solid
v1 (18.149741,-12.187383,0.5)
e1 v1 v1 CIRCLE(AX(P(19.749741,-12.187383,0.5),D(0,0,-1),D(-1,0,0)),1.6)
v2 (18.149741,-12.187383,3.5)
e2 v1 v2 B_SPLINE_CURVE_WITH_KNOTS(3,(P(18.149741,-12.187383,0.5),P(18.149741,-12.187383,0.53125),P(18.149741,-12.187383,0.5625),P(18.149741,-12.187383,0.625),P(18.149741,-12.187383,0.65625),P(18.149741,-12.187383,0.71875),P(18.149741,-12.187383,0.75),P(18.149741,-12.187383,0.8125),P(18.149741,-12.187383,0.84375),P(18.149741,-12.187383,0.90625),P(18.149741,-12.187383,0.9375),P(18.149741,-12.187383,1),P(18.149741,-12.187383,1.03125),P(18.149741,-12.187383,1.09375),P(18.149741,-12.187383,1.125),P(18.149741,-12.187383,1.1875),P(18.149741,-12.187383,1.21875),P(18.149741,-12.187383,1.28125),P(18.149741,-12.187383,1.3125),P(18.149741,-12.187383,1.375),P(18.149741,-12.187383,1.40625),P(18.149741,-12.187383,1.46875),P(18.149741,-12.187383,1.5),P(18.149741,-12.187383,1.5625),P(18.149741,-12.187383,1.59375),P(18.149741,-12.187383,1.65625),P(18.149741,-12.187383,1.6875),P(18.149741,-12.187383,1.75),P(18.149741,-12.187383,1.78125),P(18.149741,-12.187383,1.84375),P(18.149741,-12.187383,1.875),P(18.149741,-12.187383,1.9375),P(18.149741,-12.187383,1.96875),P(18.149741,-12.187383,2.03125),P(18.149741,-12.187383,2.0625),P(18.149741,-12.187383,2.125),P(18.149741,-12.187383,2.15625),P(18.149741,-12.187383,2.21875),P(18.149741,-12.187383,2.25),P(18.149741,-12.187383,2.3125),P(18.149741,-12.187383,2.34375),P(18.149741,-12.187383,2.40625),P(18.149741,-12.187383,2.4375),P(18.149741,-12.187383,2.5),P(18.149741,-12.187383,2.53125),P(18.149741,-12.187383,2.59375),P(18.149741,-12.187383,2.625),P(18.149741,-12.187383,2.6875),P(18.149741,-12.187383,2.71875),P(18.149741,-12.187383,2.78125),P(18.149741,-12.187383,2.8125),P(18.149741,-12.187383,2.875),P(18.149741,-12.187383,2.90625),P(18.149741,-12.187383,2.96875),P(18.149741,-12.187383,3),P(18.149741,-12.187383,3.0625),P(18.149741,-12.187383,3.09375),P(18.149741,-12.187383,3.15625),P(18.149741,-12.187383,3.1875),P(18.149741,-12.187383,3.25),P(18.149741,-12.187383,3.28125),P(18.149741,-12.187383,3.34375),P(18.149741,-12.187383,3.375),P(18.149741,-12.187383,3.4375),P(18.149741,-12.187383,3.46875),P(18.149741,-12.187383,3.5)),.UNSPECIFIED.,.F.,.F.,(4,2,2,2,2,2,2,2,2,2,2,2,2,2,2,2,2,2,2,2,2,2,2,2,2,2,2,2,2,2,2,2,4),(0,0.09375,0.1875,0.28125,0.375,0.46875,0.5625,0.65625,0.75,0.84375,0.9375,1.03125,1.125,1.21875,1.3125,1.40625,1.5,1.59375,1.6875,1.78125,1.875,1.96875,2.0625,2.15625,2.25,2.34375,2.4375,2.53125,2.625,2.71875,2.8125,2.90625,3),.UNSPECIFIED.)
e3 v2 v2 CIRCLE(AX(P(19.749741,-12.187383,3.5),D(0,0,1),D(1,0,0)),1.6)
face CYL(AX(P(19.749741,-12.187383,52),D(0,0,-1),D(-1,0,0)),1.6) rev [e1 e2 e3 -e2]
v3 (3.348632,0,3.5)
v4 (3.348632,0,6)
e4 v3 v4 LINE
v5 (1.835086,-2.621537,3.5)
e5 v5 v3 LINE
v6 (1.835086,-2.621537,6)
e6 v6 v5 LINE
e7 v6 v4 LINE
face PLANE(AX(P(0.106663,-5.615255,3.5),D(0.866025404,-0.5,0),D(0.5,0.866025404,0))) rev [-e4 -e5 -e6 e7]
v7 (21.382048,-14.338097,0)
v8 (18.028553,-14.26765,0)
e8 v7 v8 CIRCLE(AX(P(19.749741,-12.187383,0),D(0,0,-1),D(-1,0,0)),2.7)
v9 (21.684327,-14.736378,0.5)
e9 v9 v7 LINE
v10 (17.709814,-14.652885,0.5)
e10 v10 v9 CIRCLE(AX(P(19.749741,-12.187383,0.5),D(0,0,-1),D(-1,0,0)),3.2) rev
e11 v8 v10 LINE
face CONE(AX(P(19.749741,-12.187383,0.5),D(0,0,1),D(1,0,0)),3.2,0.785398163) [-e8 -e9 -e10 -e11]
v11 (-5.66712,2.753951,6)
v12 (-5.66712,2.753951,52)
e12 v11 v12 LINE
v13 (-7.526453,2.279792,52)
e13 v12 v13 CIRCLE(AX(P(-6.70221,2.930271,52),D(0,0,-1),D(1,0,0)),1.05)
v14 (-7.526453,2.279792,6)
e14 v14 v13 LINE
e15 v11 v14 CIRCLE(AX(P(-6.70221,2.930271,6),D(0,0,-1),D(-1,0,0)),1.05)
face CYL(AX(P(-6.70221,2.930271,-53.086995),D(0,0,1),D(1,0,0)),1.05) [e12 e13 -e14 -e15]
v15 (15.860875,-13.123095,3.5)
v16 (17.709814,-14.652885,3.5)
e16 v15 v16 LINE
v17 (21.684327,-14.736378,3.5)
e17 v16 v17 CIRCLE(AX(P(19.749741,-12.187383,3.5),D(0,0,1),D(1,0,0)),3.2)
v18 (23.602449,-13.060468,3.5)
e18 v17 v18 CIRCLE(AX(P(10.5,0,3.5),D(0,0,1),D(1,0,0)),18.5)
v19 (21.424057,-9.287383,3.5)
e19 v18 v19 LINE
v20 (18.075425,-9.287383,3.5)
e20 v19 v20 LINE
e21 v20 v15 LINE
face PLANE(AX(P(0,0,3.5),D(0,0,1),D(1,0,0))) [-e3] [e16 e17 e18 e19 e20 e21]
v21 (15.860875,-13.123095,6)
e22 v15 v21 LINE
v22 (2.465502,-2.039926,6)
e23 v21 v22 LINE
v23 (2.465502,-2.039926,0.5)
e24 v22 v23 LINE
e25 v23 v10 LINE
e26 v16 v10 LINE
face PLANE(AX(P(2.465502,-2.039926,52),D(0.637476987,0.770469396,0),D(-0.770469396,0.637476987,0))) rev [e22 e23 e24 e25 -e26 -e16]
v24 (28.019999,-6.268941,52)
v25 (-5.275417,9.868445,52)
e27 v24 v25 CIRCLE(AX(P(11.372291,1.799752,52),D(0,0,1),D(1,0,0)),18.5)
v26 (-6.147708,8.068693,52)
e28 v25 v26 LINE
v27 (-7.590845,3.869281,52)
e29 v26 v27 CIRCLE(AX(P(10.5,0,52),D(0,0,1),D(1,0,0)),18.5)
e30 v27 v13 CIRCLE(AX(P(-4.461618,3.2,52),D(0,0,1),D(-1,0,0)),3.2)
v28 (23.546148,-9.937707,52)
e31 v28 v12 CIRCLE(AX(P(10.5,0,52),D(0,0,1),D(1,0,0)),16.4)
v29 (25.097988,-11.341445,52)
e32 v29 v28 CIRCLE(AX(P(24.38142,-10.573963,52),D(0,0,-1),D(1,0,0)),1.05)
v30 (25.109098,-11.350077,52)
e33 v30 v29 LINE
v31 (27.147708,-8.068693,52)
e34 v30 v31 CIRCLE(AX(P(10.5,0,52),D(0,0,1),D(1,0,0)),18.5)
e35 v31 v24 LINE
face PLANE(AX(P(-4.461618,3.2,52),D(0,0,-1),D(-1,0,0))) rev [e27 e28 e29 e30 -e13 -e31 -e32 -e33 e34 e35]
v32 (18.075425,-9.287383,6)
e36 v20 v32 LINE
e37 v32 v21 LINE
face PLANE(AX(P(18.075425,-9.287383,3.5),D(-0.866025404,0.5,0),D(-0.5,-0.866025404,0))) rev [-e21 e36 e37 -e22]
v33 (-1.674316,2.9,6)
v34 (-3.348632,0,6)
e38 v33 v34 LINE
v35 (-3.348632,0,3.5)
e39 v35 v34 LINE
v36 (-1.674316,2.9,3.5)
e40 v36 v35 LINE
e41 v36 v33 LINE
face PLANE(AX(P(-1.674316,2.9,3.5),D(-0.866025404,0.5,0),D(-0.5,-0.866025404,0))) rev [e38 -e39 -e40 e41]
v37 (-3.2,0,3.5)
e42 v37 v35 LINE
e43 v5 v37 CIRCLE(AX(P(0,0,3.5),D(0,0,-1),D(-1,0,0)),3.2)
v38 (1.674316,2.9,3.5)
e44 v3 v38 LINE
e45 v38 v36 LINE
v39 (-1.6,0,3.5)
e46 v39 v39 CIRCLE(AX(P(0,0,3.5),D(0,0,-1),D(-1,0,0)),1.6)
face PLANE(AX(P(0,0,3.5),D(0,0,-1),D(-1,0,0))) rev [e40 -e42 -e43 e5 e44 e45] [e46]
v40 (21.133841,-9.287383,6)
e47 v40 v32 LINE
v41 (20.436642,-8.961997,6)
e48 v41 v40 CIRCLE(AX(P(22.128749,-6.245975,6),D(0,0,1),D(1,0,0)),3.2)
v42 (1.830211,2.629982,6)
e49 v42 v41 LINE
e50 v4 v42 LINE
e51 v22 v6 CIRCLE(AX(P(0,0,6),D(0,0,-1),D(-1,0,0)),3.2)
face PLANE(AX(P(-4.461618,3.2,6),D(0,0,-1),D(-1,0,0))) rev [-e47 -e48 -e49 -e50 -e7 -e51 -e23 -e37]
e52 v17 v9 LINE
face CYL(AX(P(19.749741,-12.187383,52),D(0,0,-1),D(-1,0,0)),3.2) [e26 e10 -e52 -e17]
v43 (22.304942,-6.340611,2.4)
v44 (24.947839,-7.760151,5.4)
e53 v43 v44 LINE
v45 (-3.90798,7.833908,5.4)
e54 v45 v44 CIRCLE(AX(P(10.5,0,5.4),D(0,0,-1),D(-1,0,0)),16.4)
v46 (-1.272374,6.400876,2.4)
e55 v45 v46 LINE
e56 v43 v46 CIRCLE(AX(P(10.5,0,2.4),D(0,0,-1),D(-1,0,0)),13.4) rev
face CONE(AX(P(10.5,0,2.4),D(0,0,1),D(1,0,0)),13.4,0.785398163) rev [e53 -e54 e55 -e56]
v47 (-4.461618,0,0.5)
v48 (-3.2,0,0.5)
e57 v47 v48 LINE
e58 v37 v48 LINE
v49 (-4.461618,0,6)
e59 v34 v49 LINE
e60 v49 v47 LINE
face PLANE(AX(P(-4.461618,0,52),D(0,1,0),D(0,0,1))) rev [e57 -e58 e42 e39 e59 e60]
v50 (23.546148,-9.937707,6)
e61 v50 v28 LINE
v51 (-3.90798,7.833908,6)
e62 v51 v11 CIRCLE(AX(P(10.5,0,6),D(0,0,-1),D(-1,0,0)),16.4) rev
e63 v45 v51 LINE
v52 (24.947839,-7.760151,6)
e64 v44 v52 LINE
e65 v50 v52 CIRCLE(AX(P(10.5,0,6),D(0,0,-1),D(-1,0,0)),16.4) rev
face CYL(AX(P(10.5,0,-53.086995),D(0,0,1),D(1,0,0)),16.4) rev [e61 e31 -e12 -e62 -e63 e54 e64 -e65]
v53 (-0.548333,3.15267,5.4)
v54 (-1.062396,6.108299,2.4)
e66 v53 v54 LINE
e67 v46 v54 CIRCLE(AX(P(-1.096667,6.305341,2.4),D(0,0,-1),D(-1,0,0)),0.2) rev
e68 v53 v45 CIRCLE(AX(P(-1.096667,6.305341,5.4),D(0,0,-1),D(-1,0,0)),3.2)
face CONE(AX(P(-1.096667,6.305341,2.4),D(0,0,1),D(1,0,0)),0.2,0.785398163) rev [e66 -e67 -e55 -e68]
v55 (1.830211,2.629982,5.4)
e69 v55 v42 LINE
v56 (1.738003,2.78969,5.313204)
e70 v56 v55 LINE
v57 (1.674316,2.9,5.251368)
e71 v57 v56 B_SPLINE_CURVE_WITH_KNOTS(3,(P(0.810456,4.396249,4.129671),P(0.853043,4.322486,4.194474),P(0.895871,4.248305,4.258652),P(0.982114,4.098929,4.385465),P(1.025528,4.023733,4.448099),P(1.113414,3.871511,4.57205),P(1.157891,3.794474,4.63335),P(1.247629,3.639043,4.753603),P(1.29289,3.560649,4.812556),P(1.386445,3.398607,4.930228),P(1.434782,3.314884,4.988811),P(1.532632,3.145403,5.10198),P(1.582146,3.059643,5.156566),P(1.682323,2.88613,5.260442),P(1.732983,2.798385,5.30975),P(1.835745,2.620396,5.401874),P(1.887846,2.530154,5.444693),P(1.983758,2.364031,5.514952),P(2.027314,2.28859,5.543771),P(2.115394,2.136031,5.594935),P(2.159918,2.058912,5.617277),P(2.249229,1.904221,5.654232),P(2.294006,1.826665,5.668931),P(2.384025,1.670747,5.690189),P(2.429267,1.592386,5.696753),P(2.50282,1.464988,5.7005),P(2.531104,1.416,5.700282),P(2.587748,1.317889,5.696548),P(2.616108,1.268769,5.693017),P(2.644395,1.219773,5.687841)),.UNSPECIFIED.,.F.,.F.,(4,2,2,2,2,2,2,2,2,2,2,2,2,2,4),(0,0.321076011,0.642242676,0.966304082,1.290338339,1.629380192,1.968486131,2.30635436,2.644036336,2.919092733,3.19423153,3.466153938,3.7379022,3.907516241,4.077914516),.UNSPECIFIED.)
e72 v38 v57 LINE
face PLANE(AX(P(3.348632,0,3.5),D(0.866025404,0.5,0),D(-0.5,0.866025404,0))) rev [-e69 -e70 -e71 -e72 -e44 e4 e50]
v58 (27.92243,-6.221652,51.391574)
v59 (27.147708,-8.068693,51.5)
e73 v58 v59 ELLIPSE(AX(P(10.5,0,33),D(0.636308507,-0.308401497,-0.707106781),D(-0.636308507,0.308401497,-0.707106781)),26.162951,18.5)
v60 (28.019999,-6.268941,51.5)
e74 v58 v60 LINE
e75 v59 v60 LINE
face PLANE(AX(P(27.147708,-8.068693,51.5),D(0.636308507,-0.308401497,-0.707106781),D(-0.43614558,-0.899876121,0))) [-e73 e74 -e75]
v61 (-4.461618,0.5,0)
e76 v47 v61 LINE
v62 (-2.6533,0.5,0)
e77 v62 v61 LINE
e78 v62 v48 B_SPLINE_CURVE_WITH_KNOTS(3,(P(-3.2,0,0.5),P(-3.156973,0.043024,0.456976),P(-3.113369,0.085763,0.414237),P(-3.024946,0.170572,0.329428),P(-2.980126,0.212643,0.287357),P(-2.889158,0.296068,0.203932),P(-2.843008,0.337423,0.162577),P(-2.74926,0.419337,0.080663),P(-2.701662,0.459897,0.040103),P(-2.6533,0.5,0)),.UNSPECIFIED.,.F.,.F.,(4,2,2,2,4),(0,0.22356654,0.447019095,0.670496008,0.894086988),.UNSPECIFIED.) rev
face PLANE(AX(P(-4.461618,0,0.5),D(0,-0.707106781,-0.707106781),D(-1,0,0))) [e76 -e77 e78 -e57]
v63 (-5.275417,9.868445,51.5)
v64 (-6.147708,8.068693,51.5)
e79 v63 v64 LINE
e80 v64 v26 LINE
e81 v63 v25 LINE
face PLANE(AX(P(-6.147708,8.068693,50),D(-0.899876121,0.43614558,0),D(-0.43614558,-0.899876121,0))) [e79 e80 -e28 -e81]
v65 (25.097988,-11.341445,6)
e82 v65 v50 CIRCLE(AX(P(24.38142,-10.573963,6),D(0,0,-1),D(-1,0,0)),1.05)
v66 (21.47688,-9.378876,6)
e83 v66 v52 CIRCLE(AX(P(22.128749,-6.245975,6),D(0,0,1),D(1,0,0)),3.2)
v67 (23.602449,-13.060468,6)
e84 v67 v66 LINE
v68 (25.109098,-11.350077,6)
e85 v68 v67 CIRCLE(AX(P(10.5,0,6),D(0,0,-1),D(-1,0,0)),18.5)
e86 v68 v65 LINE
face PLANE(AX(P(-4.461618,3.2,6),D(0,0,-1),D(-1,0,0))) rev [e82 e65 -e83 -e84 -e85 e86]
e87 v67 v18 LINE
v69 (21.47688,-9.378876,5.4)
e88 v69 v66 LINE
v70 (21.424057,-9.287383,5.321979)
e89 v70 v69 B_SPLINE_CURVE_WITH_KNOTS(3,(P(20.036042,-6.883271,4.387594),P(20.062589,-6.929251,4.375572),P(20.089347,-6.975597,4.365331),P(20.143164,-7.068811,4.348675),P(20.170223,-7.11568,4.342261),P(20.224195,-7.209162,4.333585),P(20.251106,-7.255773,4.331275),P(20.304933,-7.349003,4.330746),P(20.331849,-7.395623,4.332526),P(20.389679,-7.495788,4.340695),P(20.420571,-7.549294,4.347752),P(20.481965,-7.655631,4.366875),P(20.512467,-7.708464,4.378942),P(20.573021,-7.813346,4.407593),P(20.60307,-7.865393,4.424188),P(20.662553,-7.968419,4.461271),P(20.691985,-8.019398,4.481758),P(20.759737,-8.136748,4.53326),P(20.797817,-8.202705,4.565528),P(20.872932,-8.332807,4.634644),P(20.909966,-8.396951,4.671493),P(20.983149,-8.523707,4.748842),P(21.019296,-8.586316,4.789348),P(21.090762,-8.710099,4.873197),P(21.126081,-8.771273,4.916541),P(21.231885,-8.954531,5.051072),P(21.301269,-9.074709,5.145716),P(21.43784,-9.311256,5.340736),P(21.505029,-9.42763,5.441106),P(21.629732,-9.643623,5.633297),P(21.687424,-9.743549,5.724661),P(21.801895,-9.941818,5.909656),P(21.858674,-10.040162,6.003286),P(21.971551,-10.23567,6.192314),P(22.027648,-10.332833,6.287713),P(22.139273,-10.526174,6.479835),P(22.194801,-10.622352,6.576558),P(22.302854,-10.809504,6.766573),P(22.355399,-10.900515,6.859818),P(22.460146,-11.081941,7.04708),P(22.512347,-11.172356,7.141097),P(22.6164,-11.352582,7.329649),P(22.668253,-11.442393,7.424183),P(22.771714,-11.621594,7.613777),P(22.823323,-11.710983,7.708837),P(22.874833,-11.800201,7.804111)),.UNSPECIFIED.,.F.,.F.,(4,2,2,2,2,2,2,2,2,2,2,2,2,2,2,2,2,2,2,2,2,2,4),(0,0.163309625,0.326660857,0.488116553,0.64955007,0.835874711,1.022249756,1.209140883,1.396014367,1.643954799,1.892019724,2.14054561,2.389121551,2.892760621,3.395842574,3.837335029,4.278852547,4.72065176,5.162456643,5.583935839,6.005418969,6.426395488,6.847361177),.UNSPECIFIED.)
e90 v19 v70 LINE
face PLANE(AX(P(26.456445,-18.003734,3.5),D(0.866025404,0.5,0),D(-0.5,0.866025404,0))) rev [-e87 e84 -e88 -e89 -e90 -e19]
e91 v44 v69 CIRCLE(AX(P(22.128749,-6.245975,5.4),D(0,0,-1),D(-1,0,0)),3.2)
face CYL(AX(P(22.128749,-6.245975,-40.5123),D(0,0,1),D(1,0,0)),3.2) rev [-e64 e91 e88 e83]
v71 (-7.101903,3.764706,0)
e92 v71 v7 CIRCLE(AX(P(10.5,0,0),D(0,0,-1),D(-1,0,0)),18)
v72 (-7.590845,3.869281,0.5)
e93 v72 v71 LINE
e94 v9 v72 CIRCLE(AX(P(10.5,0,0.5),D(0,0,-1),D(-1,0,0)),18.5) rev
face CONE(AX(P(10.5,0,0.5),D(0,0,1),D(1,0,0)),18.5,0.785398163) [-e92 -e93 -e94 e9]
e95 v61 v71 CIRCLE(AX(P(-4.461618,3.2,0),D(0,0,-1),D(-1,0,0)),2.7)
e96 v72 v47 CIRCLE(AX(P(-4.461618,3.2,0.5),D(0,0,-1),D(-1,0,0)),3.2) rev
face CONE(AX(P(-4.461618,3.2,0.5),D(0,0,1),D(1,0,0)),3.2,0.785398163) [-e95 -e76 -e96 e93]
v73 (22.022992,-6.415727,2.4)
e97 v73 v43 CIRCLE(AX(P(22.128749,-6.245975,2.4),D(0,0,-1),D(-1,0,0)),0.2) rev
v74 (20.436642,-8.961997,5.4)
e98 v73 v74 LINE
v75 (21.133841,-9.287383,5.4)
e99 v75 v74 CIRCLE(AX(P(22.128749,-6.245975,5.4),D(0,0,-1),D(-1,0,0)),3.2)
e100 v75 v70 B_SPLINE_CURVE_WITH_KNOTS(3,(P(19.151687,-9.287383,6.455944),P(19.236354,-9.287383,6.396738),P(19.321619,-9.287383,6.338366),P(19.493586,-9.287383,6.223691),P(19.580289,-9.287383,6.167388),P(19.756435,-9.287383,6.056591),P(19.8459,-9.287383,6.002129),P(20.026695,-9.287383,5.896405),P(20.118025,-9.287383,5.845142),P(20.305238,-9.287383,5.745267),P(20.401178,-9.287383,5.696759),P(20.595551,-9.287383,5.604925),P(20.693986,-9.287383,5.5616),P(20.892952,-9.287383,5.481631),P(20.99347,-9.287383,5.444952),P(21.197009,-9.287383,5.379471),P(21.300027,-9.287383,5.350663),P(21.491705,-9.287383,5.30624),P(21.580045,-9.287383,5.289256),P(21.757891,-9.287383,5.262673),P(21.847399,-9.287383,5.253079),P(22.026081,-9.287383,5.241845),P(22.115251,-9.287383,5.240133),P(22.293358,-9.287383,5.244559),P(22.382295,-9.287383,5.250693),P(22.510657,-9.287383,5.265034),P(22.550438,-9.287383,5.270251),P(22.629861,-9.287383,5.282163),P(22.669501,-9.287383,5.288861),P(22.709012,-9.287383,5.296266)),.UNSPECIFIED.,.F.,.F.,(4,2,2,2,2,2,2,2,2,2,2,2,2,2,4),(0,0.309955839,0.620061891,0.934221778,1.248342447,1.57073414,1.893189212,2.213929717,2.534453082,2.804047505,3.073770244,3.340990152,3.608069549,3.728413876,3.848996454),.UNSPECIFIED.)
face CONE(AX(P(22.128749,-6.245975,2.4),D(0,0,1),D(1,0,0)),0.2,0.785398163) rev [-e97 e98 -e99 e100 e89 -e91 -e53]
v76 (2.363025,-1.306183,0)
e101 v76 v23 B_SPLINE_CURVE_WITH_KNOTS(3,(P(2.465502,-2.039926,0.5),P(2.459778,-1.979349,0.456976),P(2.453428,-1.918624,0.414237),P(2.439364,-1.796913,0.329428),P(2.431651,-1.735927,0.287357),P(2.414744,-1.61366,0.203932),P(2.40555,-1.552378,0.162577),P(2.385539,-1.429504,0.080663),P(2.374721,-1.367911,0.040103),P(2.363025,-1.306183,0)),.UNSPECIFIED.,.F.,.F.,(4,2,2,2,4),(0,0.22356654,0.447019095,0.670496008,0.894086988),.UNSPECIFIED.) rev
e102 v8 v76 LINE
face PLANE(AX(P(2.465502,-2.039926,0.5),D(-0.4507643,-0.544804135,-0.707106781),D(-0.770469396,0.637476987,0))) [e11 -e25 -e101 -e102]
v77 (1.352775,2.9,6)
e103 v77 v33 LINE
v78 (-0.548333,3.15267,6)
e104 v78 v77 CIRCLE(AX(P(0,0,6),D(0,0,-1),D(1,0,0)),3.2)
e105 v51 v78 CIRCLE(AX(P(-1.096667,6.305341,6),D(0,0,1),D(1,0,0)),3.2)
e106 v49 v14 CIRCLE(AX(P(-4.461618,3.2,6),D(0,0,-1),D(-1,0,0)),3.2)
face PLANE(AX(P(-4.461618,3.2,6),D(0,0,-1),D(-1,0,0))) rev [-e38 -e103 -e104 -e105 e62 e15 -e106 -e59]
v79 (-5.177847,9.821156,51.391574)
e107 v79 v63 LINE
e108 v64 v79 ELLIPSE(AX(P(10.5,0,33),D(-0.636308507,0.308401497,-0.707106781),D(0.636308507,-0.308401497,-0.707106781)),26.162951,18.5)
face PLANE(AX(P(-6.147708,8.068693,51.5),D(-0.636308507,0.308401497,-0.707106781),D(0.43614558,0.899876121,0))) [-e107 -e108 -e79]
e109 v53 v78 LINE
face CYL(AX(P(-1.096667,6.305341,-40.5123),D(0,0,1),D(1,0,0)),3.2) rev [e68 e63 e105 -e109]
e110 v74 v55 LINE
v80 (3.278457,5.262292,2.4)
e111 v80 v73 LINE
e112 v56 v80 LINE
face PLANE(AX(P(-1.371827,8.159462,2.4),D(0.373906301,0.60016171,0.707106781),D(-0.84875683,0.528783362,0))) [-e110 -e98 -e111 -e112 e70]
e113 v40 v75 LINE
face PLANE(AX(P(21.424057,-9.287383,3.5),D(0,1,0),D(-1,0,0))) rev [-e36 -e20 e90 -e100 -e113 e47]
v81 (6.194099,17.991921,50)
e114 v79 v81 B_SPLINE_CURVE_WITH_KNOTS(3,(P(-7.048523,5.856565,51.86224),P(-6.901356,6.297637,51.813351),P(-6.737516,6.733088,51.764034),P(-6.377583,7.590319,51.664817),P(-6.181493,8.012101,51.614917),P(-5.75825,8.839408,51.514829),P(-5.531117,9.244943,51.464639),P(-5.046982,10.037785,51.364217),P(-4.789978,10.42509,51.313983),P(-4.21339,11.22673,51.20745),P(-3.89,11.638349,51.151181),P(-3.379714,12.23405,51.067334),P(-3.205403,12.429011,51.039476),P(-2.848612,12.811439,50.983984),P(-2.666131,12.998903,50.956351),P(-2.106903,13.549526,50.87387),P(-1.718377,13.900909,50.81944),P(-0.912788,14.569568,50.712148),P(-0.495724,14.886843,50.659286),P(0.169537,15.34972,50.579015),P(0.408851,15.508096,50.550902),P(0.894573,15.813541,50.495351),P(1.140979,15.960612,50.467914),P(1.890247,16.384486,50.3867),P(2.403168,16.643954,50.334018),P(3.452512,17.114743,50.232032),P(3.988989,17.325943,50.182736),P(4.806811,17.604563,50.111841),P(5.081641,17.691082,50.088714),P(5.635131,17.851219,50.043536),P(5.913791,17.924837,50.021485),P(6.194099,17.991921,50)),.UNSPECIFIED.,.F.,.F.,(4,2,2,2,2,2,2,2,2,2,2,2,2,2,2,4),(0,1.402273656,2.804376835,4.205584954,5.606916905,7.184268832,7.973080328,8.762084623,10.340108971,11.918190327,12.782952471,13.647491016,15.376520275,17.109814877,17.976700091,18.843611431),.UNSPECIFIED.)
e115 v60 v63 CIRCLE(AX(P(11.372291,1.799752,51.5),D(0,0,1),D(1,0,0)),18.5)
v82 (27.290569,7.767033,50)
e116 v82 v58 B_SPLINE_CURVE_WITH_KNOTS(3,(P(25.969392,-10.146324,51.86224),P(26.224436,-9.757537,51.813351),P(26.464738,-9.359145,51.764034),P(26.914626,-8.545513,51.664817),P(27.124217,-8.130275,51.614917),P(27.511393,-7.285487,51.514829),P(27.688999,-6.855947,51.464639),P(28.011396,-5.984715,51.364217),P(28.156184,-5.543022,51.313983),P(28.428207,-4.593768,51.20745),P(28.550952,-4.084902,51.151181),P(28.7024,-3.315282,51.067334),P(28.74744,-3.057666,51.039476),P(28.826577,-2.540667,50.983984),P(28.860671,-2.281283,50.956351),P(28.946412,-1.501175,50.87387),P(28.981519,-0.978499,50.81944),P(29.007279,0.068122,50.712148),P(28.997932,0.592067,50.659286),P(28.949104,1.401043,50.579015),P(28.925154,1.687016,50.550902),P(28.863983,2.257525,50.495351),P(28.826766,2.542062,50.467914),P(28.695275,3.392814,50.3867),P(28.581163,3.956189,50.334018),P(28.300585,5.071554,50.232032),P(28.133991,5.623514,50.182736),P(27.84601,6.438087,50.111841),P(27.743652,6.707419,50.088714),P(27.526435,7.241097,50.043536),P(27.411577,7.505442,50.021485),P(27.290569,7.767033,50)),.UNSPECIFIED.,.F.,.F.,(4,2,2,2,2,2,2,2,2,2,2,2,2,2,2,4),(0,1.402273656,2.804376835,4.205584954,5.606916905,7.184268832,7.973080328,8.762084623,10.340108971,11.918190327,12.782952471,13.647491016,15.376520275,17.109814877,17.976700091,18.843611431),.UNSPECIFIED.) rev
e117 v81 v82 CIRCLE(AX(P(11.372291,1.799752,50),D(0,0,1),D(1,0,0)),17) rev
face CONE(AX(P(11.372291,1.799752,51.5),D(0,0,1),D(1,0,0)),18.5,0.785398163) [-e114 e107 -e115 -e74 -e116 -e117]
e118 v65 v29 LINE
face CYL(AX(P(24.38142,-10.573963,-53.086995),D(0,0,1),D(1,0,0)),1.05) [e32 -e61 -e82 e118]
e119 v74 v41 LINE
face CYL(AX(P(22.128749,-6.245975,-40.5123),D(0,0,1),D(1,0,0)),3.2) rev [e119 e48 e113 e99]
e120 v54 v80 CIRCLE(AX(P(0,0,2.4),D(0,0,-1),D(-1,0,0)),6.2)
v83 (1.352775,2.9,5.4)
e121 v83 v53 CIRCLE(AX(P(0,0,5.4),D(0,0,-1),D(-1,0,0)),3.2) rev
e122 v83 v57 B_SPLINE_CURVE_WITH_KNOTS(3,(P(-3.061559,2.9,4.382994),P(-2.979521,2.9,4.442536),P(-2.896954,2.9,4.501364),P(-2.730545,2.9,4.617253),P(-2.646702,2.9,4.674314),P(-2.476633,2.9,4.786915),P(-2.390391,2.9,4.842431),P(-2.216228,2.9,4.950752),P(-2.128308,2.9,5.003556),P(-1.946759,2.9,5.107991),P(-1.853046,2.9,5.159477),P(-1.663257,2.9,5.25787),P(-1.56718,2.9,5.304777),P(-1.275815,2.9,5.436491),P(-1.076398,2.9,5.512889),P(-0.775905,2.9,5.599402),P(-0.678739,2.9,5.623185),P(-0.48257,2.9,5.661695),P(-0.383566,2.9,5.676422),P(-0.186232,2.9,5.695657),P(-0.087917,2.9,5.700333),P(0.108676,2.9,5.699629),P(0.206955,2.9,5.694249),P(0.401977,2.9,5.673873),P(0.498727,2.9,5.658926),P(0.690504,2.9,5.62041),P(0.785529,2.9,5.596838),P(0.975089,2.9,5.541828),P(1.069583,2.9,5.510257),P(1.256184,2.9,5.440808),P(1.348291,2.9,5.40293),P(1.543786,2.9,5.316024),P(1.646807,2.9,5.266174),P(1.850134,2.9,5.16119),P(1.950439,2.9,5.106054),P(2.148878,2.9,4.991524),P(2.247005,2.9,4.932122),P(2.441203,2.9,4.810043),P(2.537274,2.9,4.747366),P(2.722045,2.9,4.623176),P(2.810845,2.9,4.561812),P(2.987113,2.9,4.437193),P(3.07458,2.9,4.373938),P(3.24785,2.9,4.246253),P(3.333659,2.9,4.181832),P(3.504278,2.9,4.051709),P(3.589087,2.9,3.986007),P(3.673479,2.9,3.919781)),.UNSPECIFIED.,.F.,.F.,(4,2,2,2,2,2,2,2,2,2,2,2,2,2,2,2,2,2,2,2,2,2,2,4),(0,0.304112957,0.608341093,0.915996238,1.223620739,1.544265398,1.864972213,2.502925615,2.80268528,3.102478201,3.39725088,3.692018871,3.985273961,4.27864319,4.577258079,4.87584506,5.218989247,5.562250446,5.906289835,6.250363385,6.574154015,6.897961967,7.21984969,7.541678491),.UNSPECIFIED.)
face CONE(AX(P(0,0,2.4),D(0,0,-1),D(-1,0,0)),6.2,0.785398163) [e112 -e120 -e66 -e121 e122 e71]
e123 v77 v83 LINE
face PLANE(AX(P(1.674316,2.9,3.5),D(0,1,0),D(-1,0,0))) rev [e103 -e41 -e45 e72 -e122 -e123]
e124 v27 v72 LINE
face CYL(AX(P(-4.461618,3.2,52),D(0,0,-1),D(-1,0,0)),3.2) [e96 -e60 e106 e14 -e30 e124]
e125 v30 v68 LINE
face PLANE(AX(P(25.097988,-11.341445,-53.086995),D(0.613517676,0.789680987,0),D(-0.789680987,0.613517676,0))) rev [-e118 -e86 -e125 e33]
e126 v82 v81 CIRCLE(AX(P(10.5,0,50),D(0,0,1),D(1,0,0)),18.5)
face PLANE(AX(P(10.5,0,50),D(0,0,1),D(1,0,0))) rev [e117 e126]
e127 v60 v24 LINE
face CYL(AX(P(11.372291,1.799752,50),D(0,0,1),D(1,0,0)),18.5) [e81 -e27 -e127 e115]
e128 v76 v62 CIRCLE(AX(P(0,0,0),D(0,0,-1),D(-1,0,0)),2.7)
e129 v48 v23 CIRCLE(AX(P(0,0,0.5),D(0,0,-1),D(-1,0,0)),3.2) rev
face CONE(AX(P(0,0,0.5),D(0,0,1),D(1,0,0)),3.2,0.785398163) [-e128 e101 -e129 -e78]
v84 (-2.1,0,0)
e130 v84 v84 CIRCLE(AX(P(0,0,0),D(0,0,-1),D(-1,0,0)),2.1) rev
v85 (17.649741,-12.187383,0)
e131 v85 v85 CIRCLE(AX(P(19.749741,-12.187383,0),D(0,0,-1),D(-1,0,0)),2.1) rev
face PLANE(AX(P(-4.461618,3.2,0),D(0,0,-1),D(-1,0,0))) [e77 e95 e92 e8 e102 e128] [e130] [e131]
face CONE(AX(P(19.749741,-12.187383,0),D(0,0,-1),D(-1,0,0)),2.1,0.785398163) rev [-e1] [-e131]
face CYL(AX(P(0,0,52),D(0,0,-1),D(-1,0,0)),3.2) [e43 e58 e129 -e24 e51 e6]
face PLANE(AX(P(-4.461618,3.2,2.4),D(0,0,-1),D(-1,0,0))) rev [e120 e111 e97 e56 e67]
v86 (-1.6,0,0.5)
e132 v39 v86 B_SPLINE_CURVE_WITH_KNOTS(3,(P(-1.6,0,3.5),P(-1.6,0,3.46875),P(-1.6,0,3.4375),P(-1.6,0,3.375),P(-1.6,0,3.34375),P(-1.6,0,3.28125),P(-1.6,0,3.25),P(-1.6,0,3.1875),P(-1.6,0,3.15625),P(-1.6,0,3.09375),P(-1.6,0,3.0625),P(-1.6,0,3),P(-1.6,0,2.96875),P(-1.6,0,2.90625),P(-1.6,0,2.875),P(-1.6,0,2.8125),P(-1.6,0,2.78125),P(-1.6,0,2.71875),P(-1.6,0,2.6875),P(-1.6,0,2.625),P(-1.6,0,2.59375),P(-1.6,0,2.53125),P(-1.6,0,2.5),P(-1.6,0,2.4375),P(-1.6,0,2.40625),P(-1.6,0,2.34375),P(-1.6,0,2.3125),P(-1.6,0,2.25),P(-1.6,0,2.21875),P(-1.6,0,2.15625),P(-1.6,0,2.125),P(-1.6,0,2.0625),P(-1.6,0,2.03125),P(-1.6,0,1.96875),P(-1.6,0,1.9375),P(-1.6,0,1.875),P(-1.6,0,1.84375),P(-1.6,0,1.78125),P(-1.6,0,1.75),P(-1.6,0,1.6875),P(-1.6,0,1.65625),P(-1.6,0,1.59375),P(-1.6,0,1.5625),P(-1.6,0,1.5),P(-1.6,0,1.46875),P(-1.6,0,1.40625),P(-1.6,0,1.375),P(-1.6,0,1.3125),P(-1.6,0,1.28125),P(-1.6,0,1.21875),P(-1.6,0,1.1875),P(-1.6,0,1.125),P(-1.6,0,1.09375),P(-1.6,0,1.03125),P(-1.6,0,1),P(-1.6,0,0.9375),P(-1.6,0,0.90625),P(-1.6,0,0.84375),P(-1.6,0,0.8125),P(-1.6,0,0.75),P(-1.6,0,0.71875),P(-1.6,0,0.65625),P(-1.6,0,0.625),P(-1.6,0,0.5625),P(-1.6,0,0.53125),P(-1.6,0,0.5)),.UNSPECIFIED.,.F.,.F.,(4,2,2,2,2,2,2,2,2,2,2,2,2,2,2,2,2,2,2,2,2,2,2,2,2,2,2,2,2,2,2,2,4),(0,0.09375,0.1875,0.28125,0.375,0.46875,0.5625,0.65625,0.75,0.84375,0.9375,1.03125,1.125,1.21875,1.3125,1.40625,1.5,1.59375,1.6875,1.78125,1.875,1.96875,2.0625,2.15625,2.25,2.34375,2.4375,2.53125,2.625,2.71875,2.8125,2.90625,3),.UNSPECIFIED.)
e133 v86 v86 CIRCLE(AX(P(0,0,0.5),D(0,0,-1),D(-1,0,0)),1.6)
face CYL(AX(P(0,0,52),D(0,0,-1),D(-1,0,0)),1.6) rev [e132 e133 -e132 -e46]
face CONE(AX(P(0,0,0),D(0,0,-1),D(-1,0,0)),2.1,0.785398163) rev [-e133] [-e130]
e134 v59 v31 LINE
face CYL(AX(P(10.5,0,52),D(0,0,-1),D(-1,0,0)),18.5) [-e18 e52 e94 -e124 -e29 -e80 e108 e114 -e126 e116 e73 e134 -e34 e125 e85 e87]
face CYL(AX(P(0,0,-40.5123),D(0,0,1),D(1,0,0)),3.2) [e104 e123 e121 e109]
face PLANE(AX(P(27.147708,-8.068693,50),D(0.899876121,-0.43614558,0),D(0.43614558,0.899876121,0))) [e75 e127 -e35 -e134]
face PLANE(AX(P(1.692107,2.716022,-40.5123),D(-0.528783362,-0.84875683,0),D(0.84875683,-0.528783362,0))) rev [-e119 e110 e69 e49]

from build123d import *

# Parameters (mm, degrees)
SKETCH1_R           = 1.6
BOSS_EXTRUDE1_DEPTH = 52
CUT_EXTRUDE1_DEPTH  = 46
CUT_EXTRUDE2_DEPTH  = 3.6
CHAMFER1_SIZE       = 3
CHAMFER2_SIZE       = 0.5
BOSS_EXTRUDE2_DEPTH = 2
CHAMFER3_SIZE       = 1.5
CUT_EXTRUDE4_DEPTH  = 2.5


with BuildPart() as part:
    # Sketch1 → Boss-Extrude1 (new body)
    with BuildSketch(Plane.XY):
        with BuildLine():
            Line((-4.46161756, 0), (-3.2, 0))
            ThreePointArc((-3.2, 0), (-1.084064892, -3.010781179), (2.465502069, -2.039926359))
            Line((2.465502069, -2.039926359), (17.709814498, -14.652884646))
            ThreePointArc((17.709814498, -14.652884646), (19.682532968, -15.386676734), (21.68432718, -14.736377626))
            ThreePointArc((21.68432718, -14.736377626), (20.423085706, 15.613531633), (-7.590844762, 3.869281046))
            ThreePointArc((-7.590844762, 3.869281046), (-6.949759371, 1.187749934), (-4.46161756, 0))
        make_face()
        with Locations(Location((19.749740857, -12.187382577, 0), (0, 0, 180))):
            Circle(SKETCH1_R, mode=Mode.SUBTRACT)
        with Locations(Location((0, 0, 0), (0, 0, 180))):
            Circle(SKETCH1_R, mode=Mode.SUBTRACT)
    extrude(amount=BOSS_EXTRUDE1_DEPTH)

    # Sketch2 → Cut-Extrude1 (cut)
    with BuildSketch(Plane.XY.offset(52)):
        with BuildLine():
            Line((-7.75220957, 2.930270623), (-10.26732185, 3.33405514))
            ThreePointArc((-10.26732185, 3.33405514), (2.118916828, -19.291319949), (27.109557142, -12.904270303))
            Line((27.109557142, -12.904270303), (25.097988128, -11.341445354))
            ThreePointArc((25.097988128, -11.341445354), (23.677045606, -11.352651842), (23.546148123, -9.937706936))
            ThreePointArc((23.546148123, -9.937706936), (17.03488015, 15.04178651), (-5.667119596, 2.753950614))
            ThreePointArc((-5.667119596, 2.753950614), (-6.790684219, 1.884004769), (-7.75220957, 2.930270623))
        make_face()
    extrude(amount=-CUT_EXTRUDE1_DEPTH, mode=Mode.SUBTRACT)

    # Sketch3 → Cut-Extrude2 (cut)
    with BuildSketch(Plane.XY.offset(6)):
        with BuildLine():
            Line((1.692106757, 2.716021856), (20.436641856, -8.961997016))
            ThreePointArc((20.436641856, -8.961997016), (22.952539617, -9.338121402), (24.947839186, -7.760150957))
            ThreePointArc((24.947839186, -7.760150957), (18.297055064, 14.427956624), (-3.907979798, 7.833908229))
            ThreePointArc((-3.907979798, 7.833908229), (-3.696429412, 4.43953433), (-0.548333333, 3.152670385))
            ThreePointArc((-0.548333333, 3.152670385), (0.612143689, 3.140904345), (1.692106757, 2.716021856))
        make_face()
    extrude(amount=-CUT_EXTRUDE2_DEPTH, mode=Mode.SUBTRACT)

    # Chamfer1
    chamfer1_edges = [part.edges().sort_by_distance(p)[0] for p in [
        (0.612143689, 3.140904345, 2.4),
        (11.064374306, -3.12298758, 2.4),
        (22.952539617, -9.338121402, 2.4),
        (18.297055064, 14.427956624, 2.4),
        (-3.696429412, 4.43953433, 2.4),
    ]]
    chamfer(chamfer1_edges, length=CHAMFER1_SIZE)

    # Chamfer2
    chamfer2_edges = [part.edges().sort_by_distance(p)[0] for p in [
        (21.349740857, -12.187382577, 0),
        (1.6, 0, 0),
        (20.423085706, 15.613531633, 0),
        (19.682532968, -15.386676734, 0),
        (10.087658283, -8.346405502, 0),
        (-1.084064892, -3.010781179, 0),
        (-3.83080878, 0, 0),
        (-6.949759371, 1.187749934, 0),
    ]]
    chamfer(chamfer2_edges, length=CHAMFER2_SIZE)

    # Sketch4 → Boss-Extrude2 (add)
    with BuildSketch(Plane.XY.offset(52)):
        with BuildLine():
            Line((-6.147708238, 8.068693229), (-5.275417078, 9.868445471))
            ThreePointArc((-5.275417078, 9.868445471), (19.440984389, 18.44746048), (28.019999398, -6.268940987))
            Line((28.019999398, -6.268940987), (27.147708238, -8.068693229))
            Line((27.147708238, -8.068693229), (25.257968384, -7.152787511))
            ThreePointArc((25.257968384, -7.152787511), (17.652787511, 14.757968384), (-4.257968384, 7.152787511))
            Line((-4.257968384, 7.152787511), (-6.147708238, 8.068693229))
        make_face()
    extrude(amount=-BOSS_EXTRUDE2_DEPTH)

    # Chamfer3
    # the kernel refuses this chamfer: 1.5 mm, written as the material it takes off along each edge
    with BuildSketch(Plane(origin=(-7.83015049, 4.597399062, 50), x_dir=(0.8995358930200849, -0.43598068069350693, -0.02749587661058679), z_dir=(0.4361455799615031, 0.8998761209633491, 0))) as chamfer3_piece_1_section:
        Polygon((CHAMFER3_SIZE * 0.999621916911, -CHAMFER3_SIZE * 0.0274958766106), (-CHAMFER3_SIZE * 0.0274958766106, -CHAMFER3_SIZE * 0.999621916911), (0, 0), align=None)
    chamfer3_piece_1 = extrude(amount=5.857524482, mode=Mode.PRIVATE)
    chamfer3_piece_1 = chamfer3_piece_1 - Plane(origin=(10.5, 0, 50.729873863), x_dir=(0.6045582259252599, -0.7965609527626261, 0), z_dir=(0, 0, -1)) * Cylinder(18.5, 18, mode=Mode.PRIVATE)
    add(chamfer3_piece_1, mode=Mode.SUBTRACT)
    with BuildSketch(Plane(origin=(11.37229116, 1.799752242, 50), x_dir=(-0.899876120963349, 0.43614557996150355, 0), z_dir=(-0.43614557996150355, -0.899876120963349, 0))) as chamfer3_piece_2_section:
        Polygon((18.5, -CHAMFER3_SIZE), (18.5 - CHAMFER3_SIZE, 0), (18.5, 0), align=None)
    chamfer3_piece_2 = revolve(axis=Axis((11.37229116, 1.799752242, 50), (0, 0, -1)), revolution_arc=180, mode=Mode.PRIVATE)
    chamfer3_piece_2 = chamfer3_piece_2 - Plane(origin=(10.5, 0, 50.723063531), x_dir=(0.6045582259252599, -0.7965609527626261, 0), z_dir=(0, 0, -1)) * Cylinder(18.5, 75, mode=Mode.PRIVATE)
    add(chamfer3_piece_2, mode=Mode.SUBTRACT)
    with BuildSketch(Plane(origin=(28.019999398, -6.268940987, 50), x_dir=(0.024742882786820786, -0.011992205050873842, 0.9996219169112968), z_dir=(-0.43614557996150277, -0.8998761209633493, 0))) as chamfer3_piece_3_section:
        Polygon((CHAMFER3_SIZE * 0.999621916911, CHAMFER3_SIZE * 0.0274958766106), (-CHAMFER3_SIZE * 0.0274958766106, CHAMFER3_SIZE * 0.999621916911), (0, 0), align=None)
    chamfer3_piece_3 = extrude(amount=5.857524482, mode=Mode.PRIVATE)
    chamfer3_piece_3 = chamfer3_piece_3 - Plane(origin=(10.5, 0, 50.745956447), x_dir=(0.6045582259252599, -0.7965609527626261, 0), z_dir=(0, 0, -1)) * Cylinder(18.5, 18, mode=Mode.PRIVATE)
    add(chamfer3_piece_3, mode=Mode.SUBTRACT)

    # Sketch5 → Cut-Extrude4 (cut)
    with BuildSketch(Plane.XY.offset(6)):
        Polygon((3.348631561, 0), (1.674315781, 2.9), (-1.674315781, 2.9), (-5.480163243, -3.691921171), (0.106662744, -5.615254708), align=None)
        Polygon((18.075425076, -9.287382577), (13.043037161, -18.003734129), (26.456444552, -18.003734129), (21.424056637, -9.287382577), align=None)
    extrude(amount=-CUT_EXTRUDE4_DEPTH, mode=Mode.SUBTRACT)


solid = part.part
